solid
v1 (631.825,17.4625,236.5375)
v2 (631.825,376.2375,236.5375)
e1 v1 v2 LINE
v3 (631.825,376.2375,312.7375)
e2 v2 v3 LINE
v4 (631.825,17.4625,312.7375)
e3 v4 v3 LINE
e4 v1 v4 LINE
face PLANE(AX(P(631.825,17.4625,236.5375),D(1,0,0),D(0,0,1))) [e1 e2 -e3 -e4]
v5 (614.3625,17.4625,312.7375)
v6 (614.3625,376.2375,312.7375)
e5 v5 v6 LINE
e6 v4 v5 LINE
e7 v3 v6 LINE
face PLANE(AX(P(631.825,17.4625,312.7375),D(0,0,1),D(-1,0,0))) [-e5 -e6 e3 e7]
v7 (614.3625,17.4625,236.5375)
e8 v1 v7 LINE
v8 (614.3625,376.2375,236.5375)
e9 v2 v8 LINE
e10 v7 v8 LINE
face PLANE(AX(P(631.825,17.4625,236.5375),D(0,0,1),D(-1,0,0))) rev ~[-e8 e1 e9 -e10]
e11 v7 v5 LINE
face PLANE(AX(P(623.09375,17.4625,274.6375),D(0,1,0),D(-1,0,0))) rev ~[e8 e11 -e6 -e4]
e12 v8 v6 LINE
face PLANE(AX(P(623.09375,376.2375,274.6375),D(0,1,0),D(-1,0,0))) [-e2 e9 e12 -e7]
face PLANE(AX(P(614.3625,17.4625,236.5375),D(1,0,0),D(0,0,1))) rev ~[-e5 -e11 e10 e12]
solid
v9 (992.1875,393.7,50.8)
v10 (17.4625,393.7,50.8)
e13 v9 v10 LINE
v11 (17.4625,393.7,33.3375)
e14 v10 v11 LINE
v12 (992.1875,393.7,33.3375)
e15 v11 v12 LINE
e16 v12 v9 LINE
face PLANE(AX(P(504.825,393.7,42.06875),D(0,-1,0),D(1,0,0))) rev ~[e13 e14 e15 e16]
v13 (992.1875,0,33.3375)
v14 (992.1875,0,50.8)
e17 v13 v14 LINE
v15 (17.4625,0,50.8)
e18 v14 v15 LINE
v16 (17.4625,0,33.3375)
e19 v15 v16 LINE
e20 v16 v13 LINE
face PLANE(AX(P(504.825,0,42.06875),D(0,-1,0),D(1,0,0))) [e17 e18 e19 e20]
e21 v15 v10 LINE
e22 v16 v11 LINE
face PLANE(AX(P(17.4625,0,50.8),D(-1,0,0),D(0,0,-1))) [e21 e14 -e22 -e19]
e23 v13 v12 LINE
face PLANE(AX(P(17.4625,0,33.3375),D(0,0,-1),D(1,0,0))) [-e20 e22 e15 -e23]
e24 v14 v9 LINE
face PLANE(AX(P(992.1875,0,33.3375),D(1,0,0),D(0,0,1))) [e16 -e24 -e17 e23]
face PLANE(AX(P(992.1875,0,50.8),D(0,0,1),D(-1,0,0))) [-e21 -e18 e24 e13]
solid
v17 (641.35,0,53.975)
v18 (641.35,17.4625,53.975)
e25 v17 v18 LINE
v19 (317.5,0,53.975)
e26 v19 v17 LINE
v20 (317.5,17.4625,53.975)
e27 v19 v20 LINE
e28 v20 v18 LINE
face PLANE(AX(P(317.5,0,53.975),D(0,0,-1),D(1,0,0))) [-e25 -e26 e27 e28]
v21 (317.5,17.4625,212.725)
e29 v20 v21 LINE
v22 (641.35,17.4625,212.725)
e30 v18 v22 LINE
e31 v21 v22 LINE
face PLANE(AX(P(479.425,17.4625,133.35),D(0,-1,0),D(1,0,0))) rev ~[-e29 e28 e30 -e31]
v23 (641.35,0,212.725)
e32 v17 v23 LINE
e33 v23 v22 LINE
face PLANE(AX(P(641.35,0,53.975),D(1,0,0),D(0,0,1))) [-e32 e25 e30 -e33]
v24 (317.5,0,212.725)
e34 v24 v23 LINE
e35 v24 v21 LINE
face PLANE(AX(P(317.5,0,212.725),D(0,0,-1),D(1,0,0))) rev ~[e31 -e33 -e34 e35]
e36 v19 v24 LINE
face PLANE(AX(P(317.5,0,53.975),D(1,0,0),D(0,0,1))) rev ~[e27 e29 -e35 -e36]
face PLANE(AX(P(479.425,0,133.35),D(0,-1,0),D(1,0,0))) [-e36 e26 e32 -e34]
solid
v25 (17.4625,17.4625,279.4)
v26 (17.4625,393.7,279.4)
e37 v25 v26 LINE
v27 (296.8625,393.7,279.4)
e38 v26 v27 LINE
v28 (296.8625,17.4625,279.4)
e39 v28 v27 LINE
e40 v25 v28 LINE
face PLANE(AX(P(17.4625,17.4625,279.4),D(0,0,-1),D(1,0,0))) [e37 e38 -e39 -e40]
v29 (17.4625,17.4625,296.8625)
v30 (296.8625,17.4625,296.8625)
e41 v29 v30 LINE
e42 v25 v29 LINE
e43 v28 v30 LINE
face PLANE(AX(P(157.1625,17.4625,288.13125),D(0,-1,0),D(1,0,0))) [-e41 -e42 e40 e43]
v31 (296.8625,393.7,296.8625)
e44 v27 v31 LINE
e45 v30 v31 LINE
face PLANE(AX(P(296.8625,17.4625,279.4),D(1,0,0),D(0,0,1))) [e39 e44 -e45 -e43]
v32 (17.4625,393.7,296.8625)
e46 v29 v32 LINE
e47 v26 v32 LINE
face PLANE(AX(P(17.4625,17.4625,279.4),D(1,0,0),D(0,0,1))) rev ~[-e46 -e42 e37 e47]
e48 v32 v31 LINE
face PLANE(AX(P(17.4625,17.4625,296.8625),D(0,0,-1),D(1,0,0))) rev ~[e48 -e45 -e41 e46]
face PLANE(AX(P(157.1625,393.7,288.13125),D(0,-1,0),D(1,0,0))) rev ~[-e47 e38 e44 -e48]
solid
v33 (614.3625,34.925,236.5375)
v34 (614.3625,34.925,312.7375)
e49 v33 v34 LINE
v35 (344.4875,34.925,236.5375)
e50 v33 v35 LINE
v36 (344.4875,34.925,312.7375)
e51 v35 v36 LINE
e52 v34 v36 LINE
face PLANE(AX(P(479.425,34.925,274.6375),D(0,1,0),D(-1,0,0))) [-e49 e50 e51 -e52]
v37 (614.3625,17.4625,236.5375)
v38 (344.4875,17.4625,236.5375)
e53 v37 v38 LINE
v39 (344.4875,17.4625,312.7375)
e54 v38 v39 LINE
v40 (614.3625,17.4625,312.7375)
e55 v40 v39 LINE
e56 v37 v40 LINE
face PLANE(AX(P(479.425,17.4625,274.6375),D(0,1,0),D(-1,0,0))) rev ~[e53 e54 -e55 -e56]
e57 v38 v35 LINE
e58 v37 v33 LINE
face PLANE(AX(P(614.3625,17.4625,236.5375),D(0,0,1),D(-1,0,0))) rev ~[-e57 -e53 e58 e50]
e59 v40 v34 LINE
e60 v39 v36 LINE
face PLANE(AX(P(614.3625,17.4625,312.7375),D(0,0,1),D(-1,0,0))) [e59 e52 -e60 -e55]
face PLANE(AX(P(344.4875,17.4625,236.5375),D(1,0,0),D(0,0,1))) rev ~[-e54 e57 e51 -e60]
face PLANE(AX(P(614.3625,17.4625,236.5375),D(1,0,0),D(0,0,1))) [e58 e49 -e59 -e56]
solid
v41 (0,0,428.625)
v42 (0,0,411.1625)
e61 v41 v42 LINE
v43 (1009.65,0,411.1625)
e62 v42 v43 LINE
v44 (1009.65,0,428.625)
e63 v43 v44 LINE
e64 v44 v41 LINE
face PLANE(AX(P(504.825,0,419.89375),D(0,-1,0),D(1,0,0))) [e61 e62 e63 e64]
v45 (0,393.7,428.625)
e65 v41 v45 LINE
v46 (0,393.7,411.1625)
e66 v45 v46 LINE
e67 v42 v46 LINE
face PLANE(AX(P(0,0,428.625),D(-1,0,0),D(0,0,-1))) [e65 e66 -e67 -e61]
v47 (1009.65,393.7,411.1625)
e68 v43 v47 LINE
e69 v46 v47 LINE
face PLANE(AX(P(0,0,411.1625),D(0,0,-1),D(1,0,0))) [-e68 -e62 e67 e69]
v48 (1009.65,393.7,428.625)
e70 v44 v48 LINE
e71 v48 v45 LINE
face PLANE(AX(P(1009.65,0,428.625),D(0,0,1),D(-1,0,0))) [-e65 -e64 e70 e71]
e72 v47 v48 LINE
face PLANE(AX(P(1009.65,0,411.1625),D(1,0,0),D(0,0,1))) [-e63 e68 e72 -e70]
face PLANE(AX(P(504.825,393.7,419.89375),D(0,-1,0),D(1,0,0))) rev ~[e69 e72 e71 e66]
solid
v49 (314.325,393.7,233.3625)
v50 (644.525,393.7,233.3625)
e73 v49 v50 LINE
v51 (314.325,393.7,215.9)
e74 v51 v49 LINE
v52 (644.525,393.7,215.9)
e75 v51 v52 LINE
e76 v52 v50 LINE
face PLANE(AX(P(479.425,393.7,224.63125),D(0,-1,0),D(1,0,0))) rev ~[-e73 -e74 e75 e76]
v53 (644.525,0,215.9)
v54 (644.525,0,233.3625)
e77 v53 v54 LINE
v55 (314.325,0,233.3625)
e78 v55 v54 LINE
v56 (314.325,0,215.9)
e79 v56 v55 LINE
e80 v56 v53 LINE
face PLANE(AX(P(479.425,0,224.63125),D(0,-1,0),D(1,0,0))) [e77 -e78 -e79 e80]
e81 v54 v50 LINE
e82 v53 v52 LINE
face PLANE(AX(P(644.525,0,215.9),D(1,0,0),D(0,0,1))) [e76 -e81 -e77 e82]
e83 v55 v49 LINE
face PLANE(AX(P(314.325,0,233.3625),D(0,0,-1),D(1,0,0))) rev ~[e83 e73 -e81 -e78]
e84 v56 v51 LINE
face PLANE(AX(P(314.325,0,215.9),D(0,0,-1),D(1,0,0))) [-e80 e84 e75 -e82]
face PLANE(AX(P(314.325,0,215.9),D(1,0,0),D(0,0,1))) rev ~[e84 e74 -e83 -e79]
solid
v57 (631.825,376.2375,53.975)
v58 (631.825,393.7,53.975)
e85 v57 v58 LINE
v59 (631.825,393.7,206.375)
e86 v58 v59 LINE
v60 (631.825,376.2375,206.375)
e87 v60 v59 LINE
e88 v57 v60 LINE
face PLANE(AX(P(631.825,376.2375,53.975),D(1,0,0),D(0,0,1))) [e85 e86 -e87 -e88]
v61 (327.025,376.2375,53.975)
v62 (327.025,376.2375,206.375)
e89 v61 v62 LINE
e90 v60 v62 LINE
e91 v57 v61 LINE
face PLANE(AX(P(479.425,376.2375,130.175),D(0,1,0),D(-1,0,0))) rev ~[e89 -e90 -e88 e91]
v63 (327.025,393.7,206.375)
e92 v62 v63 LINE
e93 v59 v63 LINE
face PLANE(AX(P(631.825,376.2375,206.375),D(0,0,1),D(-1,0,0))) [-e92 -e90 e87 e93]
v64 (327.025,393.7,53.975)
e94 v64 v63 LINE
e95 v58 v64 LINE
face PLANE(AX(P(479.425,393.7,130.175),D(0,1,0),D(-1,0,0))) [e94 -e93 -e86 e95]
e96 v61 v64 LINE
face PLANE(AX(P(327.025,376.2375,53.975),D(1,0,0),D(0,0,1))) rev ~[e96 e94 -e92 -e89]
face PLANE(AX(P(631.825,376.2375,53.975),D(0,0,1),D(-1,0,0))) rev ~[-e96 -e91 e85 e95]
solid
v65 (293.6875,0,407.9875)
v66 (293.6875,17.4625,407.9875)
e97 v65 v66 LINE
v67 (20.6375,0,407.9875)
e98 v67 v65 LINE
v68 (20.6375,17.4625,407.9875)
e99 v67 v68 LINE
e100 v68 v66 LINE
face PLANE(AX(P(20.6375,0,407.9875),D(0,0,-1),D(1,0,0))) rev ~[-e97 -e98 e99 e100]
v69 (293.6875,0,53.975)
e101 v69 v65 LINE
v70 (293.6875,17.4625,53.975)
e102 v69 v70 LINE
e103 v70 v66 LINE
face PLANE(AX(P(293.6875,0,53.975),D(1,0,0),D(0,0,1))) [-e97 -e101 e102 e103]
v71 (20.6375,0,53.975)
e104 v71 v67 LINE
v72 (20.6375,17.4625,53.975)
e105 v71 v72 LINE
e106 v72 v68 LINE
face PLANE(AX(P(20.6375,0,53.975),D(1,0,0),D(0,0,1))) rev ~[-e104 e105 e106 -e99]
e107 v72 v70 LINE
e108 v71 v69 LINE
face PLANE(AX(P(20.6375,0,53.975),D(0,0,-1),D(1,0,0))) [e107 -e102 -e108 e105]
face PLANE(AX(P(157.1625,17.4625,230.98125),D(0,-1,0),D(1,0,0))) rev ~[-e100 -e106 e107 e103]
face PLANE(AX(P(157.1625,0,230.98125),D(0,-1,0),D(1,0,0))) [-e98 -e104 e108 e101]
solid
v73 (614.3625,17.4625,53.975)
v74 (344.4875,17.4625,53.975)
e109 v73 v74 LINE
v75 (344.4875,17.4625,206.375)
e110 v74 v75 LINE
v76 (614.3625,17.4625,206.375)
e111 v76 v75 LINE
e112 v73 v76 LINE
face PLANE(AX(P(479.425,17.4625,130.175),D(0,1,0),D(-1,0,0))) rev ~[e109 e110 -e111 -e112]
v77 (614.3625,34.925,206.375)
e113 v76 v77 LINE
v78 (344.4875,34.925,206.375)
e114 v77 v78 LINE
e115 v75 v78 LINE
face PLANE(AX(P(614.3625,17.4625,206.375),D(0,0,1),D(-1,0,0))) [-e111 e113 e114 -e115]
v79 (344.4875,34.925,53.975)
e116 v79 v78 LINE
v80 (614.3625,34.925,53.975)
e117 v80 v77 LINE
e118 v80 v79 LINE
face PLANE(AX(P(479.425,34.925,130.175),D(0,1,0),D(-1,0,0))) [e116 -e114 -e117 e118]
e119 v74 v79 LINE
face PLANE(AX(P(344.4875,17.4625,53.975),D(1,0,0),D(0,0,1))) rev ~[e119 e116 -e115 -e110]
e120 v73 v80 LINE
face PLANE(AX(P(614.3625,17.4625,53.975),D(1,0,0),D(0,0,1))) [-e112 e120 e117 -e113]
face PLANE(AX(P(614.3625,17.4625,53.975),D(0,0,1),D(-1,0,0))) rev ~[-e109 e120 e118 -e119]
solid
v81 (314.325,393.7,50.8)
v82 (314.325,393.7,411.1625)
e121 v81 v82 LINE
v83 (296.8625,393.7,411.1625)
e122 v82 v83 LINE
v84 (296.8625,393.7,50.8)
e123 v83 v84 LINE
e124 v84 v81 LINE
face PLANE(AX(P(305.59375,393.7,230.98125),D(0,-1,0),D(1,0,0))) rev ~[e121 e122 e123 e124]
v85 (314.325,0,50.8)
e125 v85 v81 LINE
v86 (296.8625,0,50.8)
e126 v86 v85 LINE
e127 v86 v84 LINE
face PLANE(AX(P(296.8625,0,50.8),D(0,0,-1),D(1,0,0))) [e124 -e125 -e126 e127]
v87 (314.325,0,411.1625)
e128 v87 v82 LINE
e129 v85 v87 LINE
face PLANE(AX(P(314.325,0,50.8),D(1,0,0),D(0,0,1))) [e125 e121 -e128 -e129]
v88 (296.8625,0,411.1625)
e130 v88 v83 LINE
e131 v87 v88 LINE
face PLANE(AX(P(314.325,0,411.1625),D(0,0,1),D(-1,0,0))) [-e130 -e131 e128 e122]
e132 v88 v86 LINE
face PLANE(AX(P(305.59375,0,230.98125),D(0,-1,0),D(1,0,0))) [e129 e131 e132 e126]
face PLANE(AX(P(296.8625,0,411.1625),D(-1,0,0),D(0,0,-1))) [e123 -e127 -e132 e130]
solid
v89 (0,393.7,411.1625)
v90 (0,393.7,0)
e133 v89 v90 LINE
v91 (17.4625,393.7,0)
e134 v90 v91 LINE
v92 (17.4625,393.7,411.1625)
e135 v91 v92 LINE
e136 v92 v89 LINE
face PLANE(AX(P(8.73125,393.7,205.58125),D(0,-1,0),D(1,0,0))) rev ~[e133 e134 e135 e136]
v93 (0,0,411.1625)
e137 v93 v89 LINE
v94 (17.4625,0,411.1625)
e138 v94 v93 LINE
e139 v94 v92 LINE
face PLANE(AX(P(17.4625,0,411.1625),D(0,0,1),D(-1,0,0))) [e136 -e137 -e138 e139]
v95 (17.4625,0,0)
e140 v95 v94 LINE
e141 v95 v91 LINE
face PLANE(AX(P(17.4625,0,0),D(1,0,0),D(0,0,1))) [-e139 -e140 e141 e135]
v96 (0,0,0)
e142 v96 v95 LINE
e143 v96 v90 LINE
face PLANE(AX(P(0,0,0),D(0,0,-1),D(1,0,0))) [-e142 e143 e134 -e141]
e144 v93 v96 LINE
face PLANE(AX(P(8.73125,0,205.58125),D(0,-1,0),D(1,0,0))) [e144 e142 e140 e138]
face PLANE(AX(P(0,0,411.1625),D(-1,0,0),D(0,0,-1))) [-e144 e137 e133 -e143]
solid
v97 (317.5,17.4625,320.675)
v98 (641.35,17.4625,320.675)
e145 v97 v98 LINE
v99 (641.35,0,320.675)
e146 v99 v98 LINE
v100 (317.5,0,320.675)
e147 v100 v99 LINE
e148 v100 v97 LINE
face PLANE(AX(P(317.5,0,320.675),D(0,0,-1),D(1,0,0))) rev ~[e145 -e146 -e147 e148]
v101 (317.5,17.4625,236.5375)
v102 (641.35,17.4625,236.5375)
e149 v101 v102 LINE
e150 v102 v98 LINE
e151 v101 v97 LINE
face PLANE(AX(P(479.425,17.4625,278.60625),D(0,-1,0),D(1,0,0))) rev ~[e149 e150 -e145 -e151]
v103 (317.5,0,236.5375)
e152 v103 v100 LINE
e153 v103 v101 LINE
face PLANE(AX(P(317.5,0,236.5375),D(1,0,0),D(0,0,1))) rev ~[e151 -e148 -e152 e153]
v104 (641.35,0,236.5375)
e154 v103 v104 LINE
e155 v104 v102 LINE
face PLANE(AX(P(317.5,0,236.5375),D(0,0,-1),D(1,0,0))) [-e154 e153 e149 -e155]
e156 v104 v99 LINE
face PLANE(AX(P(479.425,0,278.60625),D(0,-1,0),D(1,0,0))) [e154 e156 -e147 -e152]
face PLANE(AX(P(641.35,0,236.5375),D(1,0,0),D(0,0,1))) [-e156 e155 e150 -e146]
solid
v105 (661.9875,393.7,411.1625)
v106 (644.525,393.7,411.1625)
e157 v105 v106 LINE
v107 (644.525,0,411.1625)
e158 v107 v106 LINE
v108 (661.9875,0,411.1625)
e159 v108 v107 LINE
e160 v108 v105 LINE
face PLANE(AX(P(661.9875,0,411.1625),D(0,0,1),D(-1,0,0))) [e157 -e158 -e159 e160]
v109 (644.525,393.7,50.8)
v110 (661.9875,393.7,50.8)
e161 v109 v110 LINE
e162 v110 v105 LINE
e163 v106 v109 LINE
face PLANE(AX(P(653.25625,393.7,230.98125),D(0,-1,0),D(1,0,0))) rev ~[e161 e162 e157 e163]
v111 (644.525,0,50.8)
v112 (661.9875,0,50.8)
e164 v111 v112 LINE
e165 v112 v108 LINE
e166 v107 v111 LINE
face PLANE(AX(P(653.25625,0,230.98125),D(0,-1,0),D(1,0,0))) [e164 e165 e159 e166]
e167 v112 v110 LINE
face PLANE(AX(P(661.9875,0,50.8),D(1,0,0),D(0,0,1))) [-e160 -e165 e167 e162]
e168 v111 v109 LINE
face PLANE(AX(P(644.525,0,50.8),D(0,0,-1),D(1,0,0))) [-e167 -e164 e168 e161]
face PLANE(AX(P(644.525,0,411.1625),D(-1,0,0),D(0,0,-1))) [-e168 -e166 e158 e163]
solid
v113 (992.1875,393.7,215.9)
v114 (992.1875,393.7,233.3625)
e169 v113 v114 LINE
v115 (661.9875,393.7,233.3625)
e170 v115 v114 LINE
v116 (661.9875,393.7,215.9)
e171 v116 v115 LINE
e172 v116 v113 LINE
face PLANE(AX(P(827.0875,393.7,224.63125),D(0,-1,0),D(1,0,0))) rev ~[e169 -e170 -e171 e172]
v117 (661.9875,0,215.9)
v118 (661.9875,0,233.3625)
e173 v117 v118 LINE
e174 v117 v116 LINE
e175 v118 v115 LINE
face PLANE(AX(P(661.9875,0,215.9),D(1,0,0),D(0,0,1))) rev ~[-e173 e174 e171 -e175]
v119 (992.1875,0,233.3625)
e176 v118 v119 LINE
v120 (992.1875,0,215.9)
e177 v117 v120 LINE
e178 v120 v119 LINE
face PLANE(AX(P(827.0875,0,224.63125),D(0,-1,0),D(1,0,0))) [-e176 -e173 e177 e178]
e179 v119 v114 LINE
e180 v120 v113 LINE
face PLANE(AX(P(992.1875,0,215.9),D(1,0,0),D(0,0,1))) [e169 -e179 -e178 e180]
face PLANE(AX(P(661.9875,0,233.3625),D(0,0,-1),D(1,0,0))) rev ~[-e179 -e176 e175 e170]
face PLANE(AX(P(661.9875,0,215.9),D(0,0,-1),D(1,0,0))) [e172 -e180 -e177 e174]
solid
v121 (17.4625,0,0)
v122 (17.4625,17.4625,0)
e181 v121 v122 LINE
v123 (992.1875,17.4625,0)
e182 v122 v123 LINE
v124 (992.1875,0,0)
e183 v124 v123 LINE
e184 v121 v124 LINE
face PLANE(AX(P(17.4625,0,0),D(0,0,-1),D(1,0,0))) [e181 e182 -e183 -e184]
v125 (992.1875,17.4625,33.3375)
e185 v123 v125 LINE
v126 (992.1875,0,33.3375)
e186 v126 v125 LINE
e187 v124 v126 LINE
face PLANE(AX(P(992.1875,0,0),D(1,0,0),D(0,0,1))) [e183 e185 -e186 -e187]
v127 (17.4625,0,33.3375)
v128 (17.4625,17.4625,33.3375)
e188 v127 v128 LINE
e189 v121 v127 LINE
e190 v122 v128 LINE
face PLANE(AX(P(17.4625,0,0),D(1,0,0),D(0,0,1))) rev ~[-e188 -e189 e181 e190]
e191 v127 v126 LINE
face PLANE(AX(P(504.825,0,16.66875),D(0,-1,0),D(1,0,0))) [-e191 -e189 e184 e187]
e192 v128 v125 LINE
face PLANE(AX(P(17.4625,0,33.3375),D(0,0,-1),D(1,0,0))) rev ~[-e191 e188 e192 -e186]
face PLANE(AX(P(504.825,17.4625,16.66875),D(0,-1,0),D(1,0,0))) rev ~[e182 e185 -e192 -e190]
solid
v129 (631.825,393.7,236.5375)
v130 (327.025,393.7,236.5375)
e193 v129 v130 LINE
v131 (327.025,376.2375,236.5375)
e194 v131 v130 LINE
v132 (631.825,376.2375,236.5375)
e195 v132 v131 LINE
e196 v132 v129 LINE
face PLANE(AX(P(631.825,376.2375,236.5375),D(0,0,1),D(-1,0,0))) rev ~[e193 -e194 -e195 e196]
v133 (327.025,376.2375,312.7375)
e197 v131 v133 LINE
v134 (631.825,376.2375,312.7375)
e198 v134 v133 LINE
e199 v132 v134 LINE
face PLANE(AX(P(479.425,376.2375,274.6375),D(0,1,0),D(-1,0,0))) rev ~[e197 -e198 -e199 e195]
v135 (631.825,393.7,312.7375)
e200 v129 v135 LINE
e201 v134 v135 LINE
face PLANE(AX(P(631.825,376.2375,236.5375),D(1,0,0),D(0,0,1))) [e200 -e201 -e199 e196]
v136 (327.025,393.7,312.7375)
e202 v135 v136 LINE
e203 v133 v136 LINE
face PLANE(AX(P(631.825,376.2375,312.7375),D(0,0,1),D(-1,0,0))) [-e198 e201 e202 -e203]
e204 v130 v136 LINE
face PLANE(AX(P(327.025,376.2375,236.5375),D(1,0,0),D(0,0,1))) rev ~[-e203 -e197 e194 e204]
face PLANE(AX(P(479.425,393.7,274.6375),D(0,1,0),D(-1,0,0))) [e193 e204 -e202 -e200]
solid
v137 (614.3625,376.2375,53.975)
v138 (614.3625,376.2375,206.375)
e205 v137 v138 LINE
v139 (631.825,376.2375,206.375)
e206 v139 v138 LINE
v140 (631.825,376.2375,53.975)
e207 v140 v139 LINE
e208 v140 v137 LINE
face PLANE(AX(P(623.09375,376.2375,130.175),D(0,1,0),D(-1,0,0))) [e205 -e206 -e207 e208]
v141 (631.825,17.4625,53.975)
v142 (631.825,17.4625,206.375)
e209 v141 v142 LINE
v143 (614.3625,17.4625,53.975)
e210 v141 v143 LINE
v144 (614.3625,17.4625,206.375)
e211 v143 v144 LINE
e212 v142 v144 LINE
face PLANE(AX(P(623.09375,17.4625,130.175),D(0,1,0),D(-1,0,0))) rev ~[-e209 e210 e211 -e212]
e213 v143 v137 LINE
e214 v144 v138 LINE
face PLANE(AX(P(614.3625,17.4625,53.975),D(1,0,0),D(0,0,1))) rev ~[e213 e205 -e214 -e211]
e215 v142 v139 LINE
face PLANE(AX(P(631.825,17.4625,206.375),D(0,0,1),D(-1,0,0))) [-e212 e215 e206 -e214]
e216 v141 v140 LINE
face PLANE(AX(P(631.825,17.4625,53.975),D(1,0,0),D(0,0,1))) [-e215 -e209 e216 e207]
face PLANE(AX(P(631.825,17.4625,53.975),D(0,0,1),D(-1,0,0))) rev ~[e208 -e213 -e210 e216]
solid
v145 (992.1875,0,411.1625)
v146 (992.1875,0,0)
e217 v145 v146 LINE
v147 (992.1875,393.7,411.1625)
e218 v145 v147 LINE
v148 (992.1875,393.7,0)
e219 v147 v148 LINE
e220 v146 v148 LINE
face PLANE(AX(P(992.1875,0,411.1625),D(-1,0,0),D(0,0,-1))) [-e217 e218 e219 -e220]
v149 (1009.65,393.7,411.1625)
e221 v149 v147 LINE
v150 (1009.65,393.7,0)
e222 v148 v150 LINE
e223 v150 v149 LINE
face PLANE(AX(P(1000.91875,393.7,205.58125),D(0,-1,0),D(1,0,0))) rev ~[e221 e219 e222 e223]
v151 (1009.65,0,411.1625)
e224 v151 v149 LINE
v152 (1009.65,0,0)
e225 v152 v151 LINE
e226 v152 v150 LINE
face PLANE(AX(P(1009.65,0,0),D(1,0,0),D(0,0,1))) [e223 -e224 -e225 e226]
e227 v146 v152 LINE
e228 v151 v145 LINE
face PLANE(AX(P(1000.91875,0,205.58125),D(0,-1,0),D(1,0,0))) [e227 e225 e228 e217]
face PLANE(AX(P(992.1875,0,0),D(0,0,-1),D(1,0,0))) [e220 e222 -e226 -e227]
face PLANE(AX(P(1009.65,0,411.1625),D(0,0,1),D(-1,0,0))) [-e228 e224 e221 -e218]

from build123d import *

# Parameters (mm, degrees)
F3_DEPTH  = 393.7
F4_DEPTH  = 393.7
F5_DEPTH  = 393.7
F6_DEPTH  = 393.7
F7_DEPTH  = 393.7
F8_START  = -17.4625
F2_W      = 279.4
F2_H      = 17.4625
F8_DEPTH  = 376.2375
F9_DEPTH  = 393.7
F2_W_2    = 974.725
F2_H_2    = 33.3375
F10_DEPTH = 17.4625
F2_W_3    = 330.2
F11_DEPTH = 393.7
F12_DEPTH = 393.7
F13_W     = 323.85
F13_H     = 158.75
F14_DEPTH = 17.4625
F15_W     = 17.4625
F15_H     = 152.4
F16_DEPTH = 358.775
F17_W     = 304.8
F17_H     = 152.4
F18_DEPTH = 17.4625
F19_W     = 273.05
F19_H     = 354.0125
F20_DEPTH = 17.4625
F21_W     = 323.85
F21_H     = 84.1375
F22_DEPTH = 17.4625
F23_W     = 269.875
F23_H     = 152.4
F24_DEPTH = 17.4625
F25_W     = 17.4625
F25_H     = 76.2
F26_DEPTH = 358.775
F27_W     = 269.875
F27_H     = 76.2
F28_DEPTH = 17.4625
F29_W     = 304.8
F29_H     = 76.2
F30_DEPTH = 17.4625


# Not quite as in the source:
# - a variable given as a bare number and used for a length is read in inches; the dataset says mm whatever the document's units were


with BuildPart() as f3:
    # F2 (on Front) → F3 (new body)
    with BuildSketch(Plane.XZ):
        Polygon((0, 428.625), (0, 411.1625), (17.4625, 411.1625), (296.8625, 411.1625), (314.325, 411.1625), (644.525, 411.1625), (661.9875, 411.1625), (992.1875, 411.1625), (1009.65, 411.1625), (1009.65, 428.625), align=None)
    extrude(amount=-F3_DEPTH)


with BuildPart() as f4:
    # F2 (on Front) → F4 (new body)
    with BuildSketch(Plane.XZ):
        Polygon((0, 411.1625), (0, 0), (17.4625, 0), (17.4625, 33.3375), (17.4625, 50.8), (17.4625, 279.4), (17.4625, 296.8625), (17.4625, 411.1625), align=None)
    extrude(amount=-F4_DEPTH)


with BuildPart() as f5:
    # F2 (on Front) → F5 (new body)
    with BuildSketch(Plane.XZ):
        Polygon((314.325, 411.1625), (296.8625, 411.1625), (296.8625, 296.8625), (296.8625, 279.4), (296.8625, 50.8), (314.325, 50.8), (314.325, 215.9), (314.325, 233.3625), (314.325, 322.2625), align=None)
    extrude(amount=-F5_DEPTH)


with BuildPart() as f6:
    # F2 (on Front) → F6 (new body)
    with BuildSketch(Plane.XZ):
        Polygon((644.525, 50.8), (661.9875, 50.8), (661.9875, 215.9), (661.9875, 233.3625), (661.9875, 322.2625), (661.9875, 411.1625), (644.525, 411.1625), (644.525, 322.2625), (644.525, 233.3625), (644.525, 215.9), align=None)
    extrude(amount=-F6_DEPTH)


with BuildPart() as f7:
    # F2 (on Front) → F7 (new body)
    with BuildSketch(Plane.XZ):
        Polygon((992.1875, 33.3375), (992.1875, 0), (1009.65, 0), (1009.65, 411.1625), (992.1875, 411.1625), (992.1875, 322.2625), (992.1875, 233.3625), (992.1875, 215.9), (992.1875, 50.8), align=None)
    extrude(amount=-F7_DEPTH)


with BuildPart() as f8:
    # F2 (on Front) → F8 (new body)
    with BuildSketch(Plane.XZ.offset(F8_START)):
        with Locations((157.1625, 288.13125)):
            Rectangle(F2_W, F2_H)
    extrude(amount=-F8_DEPTH)


with BuildPart() as f9:
    # F2 (on Front) → F9 (new body)
    with BuildSketch(Plane.XZ):
        Polygon((17.4625, 50.8), (17.4625, 33.3375), (992.1875, 33.3375), (992.1875, 50.8), (661.9875, 50.8), (644.525, 50.8), (314.325, 50.8), (296.8625, 50.8), align=None)
    extrude(amount=-F9_DEPTH)


with BuildPart() as f10:
    # F2 (on Front) → F10 (new body)
    with BuildSketch(Plane.XZ):
        with Locations((504.825, 16.66875)):
            Rectangle(F2_W_2, F2_H_2)
    extrude(amount=-F10_DEPTH)


with BuildPart() as f11:
    # F2 (on Front) → F11 (new body)
    with BuildSketch(Plane.XZ):
        with Locations((479.425, 224.63125)):
            Rectangle(F2_W_3, F2_H)
    extrude(amount=-F11_DEPTH)


with BuildPart() as f12:
    # F2 (on Front) → F12 (new body)
    with BuildSketch(Plane.XZ):
        with Locations((827.0875, 224.63125)):
            Rectangle(F2_W_3, F2_H)
    extrude(amount=-F12_DEPTH)


with BuildPart() as f14:
    # F13 (on Front) → F14 (new body)
    with BuildSketch(Plane.XZ):
        with Locations((479.425, 133.35)):
            Rectangle(F13_W, F13_H)
    extrude(amount=-F14_DEPTH)


with BuildPart() as f16:
    # F15 (on face) → F16 (new body)
    with BuildSketch(Plane(origin=(0, 17.4625, 0), x_dir=(-1, 0, 0), z_dir=(0, 1, 0))):
        with Locations((-623.09375, 130.175)):
            Rectangle(F15_W, F15_H)
    extrude(amount=F16_DEPTH)


with BuildPart() as f18:
    # F17 (on face) → F18 (new body)
    with BuildSketch(Plane(origin=(0, 376.2375, 0), x_dir=(-1, 0, 0), z_dir=(0, 1, 0))):
        with Locations((-479.425, 130.175)):
            Rectangle(F17_W, F17_H)
    extrude(amount=F18_DEPTH)


with BuildPart() as f20:
    # F19 (on Front) → F20 (new body)
    with BuildSketch(Plane.XZ):
        with Locations((157.1625, 230.98125)):
            Rectangle(F19_W, F19_H)
    extrude(amount=-F20_DEPTH)


with BuildPart() as f22:
    # F21 (on Front) → F22 (new body)
    with BuildSketch(Plane.XZ):
        with Locations((479.425, 278.60625)):
            Rectangle(F21_W, F21_H)
    extrude(amount=-F22_DEPTH)


with BuildPart() as f24:
    # F23 (on face) → F24 (new body)
    with BuildSketch(Plane(origin=(0, 17.4625, 0), x_dir=(-1, 0, 0), z_dir=(0, 1, 0))):
        with Locations((-479.425, 130.175)):
            Rectangle(F23_W, F23_H)
    extrude(amount=F24_DEPTH)


with BuildPart() as f26:
    # F25 (on face) → F26 (new body)
    with BuildSketch(Plane(origin=(0, 17.4625, 0), x_dir=(-1, 0, 0), z_dir=(0, 1, 0))):
        with Locations((-623.09375, 274.6375)):
            Rectangle(F25_W, F25_H)
    extrude(amount=F26_DEPTH)


with BuildPart() as f28:
    # F27 (on face) → F28 (new body)
    with BuildSketch(Plane(origin=(0, 17.4625, 0), x_dir=(-1, 0, 0), z_dir=(0, 1, 0))):
        with Locations((-479.425, 274.6375)):
            Rectangle(F27_W, F27_H)
    extrude(amount=F28_DEPTH)


with BuildPart() as f30:
    # F29 (on face) → F30 (new body)
    with BuildSketch(Plane(origin=(0, 376.2375, 0), x_dir=(-1, 0, 0), z_dir=(0, 1, 0))):
        with Locations((-479.425, 274.6375)):
            Rectangle(F29_W, F29_H)
    extrude(amount=F30_DEPTH)


solid = Compound([f3.part, f4.part, f5.part, f6.part, f7.part, f8.part, f9.part, f10.part, f11.part, f12.part, f14.part, f16.part, f18.part, f20.part, f22.part, f24.part, f26.part, f28.part, f30.part])
